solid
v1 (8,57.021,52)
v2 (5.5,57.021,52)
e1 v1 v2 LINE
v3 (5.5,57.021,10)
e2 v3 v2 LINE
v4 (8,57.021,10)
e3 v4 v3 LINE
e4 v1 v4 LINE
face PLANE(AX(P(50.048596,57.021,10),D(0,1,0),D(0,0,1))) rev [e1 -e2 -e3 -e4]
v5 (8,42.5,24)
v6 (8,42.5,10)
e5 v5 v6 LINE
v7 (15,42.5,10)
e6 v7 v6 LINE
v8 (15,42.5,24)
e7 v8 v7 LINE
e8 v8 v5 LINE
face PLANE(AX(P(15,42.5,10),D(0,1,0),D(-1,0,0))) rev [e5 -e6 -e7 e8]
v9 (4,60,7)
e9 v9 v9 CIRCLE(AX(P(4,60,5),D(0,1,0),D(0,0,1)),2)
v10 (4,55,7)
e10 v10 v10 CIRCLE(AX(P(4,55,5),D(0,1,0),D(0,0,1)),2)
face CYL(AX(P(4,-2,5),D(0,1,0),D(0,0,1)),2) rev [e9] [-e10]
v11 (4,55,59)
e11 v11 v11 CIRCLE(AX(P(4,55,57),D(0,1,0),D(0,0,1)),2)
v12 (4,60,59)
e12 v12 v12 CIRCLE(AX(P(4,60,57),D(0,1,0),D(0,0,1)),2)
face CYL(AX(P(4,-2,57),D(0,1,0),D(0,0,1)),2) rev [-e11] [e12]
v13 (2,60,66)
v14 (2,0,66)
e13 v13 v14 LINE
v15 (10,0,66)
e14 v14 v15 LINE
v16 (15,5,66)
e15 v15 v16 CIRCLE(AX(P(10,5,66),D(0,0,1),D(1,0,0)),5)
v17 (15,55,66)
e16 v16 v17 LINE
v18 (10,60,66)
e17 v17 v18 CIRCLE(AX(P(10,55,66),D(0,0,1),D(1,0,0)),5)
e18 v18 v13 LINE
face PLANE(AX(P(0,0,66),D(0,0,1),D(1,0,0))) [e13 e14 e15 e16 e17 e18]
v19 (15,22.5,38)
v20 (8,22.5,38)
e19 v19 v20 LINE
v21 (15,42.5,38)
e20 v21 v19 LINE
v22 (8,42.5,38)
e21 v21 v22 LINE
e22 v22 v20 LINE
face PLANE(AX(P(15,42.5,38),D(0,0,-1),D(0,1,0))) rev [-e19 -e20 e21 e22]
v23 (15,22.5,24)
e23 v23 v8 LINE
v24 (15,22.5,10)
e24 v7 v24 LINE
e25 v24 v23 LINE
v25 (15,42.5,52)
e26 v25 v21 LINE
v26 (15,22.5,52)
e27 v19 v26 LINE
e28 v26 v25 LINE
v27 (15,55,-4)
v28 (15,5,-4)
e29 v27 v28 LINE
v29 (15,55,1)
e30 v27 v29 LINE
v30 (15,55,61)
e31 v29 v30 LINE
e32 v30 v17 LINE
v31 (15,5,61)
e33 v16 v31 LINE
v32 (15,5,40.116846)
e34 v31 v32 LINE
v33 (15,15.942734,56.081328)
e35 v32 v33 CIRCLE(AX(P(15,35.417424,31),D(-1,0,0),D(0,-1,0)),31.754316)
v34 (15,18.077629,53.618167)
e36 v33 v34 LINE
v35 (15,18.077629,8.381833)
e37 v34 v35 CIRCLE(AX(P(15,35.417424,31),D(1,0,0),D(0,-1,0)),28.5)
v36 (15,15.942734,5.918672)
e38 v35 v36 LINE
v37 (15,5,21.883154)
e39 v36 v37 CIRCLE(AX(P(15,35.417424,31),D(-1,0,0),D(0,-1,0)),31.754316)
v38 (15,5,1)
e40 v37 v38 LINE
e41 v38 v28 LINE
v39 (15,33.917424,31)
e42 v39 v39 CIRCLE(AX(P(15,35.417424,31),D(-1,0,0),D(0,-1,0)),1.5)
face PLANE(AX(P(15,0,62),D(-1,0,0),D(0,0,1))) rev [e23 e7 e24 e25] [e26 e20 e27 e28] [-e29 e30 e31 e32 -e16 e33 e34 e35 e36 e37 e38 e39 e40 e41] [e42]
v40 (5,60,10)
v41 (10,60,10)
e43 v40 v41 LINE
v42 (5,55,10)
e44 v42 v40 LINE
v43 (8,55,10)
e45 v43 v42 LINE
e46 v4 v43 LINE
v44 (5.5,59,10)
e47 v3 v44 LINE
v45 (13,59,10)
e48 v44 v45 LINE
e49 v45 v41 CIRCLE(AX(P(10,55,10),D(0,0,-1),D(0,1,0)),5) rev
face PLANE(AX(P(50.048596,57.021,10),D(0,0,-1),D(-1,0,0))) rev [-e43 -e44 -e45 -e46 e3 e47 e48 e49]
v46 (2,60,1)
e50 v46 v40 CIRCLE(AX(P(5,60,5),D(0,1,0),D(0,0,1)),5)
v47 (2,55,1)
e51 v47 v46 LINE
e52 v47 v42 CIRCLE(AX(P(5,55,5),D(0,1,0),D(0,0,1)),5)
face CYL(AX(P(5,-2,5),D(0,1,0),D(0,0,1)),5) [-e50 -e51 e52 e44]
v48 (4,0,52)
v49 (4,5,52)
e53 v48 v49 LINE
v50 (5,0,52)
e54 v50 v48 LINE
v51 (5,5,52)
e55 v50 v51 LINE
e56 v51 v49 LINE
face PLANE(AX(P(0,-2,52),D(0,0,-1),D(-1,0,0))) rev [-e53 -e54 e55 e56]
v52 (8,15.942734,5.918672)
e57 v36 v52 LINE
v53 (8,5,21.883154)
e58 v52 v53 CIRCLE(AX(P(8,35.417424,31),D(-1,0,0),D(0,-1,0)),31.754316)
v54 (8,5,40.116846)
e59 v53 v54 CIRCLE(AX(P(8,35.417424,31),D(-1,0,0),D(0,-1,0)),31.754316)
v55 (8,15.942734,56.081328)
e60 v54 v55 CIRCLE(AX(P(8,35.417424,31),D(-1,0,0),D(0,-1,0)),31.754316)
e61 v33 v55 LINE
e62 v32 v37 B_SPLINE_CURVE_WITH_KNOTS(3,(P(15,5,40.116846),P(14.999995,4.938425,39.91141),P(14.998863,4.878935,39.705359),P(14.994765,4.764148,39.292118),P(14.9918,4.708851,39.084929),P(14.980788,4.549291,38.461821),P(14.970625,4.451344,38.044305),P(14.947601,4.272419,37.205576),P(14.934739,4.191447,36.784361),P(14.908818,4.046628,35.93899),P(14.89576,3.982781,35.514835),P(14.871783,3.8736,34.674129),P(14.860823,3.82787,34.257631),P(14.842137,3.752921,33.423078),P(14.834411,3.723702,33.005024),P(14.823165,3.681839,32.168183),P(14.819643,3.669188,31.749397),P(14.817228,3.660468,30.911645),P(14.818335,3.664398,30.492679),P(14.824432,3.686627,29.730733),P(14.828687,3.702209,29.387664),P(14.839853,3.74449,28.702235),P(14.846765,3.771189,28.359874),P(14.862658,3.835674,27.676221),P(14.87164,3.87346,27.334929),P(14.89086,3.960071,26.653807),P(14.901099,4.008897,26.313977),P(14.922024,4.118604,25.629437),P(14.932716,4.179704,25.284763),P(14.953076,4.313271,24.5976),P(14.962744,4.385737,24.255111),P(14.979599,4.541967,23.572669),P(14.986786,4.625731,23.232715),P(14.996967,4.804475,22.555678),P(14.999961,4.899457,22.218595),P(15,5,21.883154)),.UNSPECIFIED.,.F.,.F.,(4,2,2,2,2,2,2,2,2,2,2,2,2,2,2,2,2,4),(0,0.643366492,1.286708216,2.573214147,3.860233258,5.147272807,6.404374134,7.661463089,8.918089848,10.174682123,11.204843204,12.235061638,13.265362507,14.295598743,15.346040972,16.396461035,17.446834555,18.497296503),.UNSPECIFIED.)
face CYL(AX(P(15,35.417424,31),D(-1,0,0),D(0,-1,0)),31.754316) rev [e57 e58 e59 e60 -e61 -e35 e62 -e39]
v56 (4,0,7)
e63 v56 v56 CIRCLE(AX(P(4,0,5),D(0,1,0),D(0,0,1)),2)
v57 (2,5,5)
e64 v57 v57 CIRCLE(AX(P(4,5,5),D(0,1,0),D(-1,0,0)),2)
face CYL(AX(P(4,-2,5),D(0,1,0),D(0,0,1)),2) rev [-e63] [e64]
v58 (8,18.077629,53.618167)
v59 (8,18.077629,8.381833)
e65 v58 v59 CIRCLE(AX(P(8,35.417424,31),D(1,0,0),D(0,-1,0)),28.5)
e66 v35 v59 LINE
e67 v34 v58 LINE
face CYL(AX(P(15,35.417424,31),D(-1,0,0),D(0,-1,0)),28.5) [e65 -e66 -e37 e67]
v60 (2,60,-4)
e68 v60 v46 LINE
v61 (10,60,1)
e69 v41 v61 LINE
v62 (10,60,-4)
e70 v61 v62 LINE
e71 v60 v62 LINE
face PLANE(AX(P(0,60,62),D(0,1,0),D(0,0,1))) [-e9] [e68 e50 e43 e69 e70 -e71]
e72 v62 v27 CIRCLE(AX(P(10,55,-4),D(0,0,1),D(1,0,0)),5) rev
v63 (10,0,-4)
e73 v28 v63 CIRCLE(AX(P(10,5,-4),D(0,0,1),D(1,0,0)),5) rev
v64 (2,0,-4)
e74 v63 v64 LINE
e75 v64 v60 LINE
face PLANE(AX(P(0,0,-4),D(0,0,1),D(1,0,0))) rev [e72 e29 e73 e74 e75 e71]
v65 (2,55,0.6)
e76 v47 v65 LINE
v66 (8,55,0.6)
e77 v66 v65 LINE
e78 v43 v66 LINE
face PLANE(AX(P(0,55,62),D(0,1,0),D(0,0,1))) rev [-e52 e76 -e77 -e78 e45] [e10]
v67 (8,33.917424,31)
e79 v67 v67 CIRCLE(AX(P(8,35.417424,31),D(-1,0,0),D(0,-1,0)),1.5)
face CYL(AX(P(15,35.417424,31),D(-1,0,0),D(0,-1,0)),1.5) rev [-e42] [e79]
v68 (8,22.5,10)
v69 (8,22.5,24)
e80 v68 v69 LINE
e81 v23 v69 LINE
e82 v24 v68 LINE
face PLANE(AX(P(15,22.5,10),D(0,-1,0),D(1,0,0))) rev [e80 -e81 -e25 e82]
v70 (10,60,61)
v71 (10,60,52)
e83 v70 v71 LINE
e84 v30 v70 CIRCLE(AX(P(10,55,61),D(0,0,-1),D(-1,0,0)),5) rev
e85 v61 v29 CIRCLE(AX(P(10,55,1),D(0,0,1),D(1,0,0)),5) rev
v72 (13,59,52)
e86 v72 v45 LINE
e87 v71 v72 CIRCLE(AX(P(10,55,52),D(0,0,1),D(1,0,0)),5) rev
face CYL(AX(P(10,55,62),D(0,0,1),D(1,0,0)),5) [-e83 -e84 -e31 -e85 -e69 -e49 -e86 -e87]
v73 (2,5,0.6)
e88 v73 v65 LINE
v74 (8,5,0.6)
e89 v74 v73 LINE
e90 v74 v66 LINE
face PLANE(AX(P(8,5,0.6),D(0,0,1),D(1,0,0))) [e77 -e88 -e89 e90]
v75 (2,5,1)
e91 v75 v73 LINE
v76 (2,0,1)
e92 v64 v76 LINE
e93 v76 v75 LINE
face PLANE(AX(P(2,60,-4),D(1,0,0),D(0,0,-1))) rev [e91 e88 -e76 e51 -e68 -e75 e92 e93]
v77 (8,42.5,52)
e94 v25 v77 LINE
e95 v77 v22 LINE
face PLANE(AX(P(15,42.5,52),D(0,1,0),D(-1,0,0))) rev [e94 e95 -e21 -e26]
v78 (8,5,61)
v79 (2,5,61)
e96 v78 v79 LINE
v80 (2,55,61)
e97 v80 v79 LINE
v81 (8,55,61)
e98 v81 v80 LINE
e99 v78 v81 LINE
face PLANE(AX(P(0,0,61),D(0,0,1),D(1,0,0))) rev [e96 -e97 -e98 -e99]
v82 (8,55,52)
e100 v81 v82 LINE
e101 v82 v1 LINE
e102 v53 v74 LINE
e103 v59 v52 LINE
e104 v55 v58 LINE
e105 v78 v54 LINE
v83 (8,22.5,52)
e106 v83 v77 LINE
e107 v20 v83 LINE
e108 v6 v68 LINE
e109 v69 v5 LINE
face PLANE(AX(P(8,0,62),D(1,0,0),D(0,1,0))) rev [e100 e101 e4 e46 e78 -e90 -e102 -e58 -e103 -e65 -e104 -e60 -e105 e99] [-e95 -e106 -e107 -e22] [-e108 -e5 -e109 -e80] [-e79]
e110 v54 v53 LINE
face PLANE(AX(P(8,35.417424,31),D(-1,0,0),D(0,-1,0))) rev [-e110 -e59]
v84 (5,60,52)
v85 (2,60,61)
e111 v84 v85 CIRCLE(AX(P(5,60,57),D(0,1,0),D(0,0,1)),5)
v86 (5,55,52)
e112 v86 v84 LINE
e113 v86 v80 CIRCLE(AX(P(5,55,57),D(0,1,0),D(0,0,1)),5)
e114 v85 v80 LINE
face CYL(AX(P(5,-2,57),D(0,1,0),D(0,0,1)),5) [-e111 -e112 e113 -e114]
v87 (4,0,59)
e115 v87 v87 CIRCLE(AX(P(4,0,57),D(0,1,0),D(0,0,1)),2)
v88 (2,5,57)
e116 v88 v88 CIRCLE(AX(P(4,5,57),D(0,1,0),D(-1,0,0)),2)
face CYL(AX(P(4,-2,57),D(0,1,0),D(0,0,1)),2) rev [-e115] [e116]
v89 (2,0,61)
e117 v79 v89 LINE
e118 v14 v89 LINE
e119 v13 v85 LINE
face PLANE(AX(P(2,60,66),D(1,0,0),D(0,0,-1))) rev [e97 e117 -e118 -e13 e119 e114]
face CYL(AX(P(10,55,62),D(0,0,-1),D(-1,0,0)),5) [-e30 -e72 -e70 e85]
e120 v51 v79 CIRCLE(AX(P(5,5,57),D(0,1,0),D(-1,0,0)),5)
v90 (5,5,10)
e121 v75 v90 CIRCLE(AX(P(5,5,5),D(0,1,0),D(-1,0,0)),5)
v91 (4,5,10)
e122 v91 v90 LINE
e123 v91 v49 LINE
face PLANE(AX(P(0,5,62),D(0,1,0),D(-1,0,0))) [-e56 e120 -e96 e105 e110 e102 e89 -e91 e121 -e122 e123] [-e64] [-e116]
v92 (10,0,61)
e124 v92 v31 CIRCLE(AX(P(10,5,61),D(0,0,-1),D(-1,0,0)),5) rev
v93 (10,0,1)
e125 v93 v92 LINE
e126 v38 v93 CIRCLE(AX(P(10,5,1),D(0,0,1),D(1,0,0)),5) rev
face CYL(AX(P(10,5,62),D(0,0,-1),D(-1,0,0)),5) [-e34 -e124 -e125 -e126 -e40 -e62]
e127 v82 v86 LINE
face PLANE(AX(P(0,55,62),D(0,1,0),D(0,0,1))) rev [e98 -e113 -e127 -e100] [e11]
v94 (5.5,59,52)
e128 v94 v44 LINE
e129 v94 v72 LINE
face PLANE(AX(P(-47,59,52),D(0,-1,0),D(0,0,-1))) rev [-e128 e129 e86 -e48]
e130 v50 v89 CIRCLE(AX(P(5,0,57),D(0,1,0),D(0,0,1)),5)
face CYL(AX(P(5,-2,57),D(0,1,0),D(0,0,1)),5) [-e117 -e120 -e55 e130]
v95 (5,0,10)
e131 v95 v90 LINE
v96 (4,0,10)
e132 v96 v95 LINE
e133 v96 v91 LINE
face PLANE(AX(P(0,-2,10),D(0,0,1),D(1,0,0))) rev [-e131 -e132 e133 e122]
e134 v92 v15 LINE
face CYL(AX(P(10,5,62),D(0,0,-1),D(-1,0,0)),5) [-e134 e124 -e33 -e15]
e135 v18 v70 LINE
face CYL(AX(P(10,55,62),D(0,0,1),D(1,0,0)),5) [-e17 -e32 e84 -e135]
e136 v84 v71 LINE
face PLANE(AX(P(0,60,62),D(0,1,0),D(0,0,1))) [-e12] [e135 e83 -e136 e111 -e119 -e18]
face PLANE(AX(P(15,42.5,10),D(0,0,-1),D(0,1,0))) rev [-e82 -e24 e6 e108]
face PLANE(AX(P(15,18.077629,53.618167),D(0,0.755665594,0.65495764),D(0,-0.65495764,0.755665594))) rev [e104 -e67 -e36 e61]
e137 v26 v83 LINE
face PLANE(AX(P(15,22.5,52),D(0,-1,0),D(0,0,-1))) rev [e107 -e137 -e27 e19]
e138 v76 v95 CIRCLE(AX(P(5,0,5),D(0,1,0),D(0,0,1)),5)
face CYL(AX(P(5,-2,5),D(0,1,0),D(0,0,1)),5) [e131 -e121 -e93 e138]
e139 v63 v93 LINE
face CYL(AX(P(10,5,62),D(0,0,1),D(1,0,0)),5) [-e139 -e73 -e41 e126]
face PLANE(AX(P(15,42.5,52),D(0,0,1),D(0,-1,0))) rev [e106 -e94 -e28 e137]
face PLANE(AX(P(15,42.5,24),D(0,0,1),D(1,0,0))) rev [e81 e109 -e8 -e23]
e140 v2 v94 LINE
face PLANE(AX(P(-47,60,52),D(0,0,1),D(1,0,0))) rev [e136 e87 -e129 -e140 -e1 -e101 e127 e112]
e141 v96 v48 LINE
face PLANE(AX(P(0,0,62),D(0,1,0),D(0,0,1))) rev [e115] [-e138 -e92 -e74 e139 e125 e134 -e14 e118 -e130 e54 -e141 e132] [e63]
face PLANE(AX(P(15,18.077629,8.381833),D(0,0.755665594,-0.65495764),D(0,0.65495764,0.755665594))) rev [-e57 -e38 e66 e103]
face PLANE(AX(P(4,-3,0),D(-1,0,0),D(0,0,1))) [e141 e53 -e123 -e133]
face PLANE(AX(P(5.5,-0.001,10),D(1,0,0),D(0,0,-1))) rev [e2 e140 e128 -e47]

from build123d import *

# Parameters (mm, degrees)
EXTRUDE_1_DEPTH      = 62
FILLET_1_R           = 5
SKETCH_2_W           = 42
SKETCH_2_H           = 1
CUT_EXTRUDE_1_DEPTH  = 62
SKETCH_3_R           = 2
CUT_EXTRUDE_2_DEPTH  = 62
SKETCH_4_W           = 42
SKETCH_4_H           = 2.021
CUT_EXTRUDE_3_DEPTH  = 8
CUT_EXTRUDE_4_DEPTH  = 62
SKETCH_6_W           = 4
SKETCH_6_H           = 42
CUT_EXTRUDE_5_DEPTH  = 62
SKETCH_8_R           = 1.5
SKETCH_8_W           = 14
SKETCH_8_H           = 20
CUT_EXTRUDE_7_DEPTH  = 87.64871609
CUT_EXTRUDE_8_REACH  = 88.891
SKETCH_9_W           = 1.5
SKETCH_9_H           = 42
SKETCH_11_W          = 13.506471924
SKETCH_11_H          = 1
CUT_EXTRUDE_10_DEPTH = 88.572826992
SKETCH_13_W          = 13
SKETCH_13_H          = 60
EXTRUDE_5_DEPTH      = 5
FILLET_2_R           = 5
SKETCH_14_W          = 13
SKETCH_14_H          = 60
EXTRUDE_6_DEPTH      = 5
FILLET_3_R           = 5
SKETCH_15_W          = 0.4
SKETCH_15_H          = 50
CUT_EXTRUDE_11_DEPTH = 6


with BuildPart() as part:
    # 草图1 → 凸台-拉伸1 (new body)
    with BuildSketch(Plane.XY):
        Polygon((0, 5), (0, 0), (15, 0), (15, 60), (0, 60), (0, 55), (8, 55), (8, 5), align=None)
    extrude(amount=EXTRUDE_1_DEPTH)

    # 圆角1
    fillet_1_edges = [part.edges().sort_by_distance(p)[0] for p in [
        (15, 60, 31),
        (15, 0, 31),
    ]]
    fillet(fillet_1_edges, radius=FILLET_1_R)

    # 草图2 → 切除-拉伸1 (cut)
    with BuildSketch(Plane(origin=(15, 0, 0), x_dir=(0, 0, -1), z_dir=(1, 0, 0))):
        with Locations((-31, 59.5)):
            Rectangle(SKETCH_2_W, SKETCH_2_H)
    extrude(amount=-CUT_EXTRUDE_1_DEPTH, mode=Mode.SUBTRACT)

    # 草图3 → 切除-拉伸2 (cut)
    with BuildSketch(Plane(origin=(0, 60, 0), x_dir=(1, 0, 0), z_dir=(0, 1, 0))):
        with Locations(Location((4, -57, 0), (0, 0, 270))):
            Circle(SKETCH_3_R)
        with Locations(Location((4, -5, 0), (0, 0, 270))):
            Circle(SKETCH_3_R)
    extrude(amount=-CUT_EXTRUDE_2_DEPTH, mode=Mode.SUBTRACT)

    # 草图4 → 切除-拉伸3 (cut)
    with BuildSketch(Plane.ZY):
        with Locations((31, 56.0105)):
            Rectangle(SKETCH_4_W, SKETCH_4_H)
    extrude(amount=-CUT_EXTRUDE_3_DEPTH, mode=Mode.SUBTRACT)

    # 草图5 → 切除-拉伸4 (cut)
    with BuildSketch(Plane(origin=(0, 60, 0), x_dir=(1, 0, 0), z_dir=(0, 1, 0))):
        with BuildLine():
            ThreePointArc((0, -5), (1.464466094, -1.464466094), (5, 0))
            Line((5, 0), (0, 0))
            Line((0, 0), (0, -5))
        make_face()
        with BuildLine():
            ThreePointArc((5, -10), (1.464466094, -8.535533906), (0, -5))
            Line((0, -5), (0, -10))
            Line((0, -10), (5, -10))
        make_face()
        with BuildLine():
            ThreePointArc((0, -57), (1.464466094, -53.464466094), (5, -52))
            Line((5, -52), (0, -52))
            Line((0, -52), (0, -57))
        make_face()
        with BuildLine():
            ThreePointArc((5, -62), (1.464466094, -60.535533906), (0, -57))
            Line((0, -57), (0, -62))
            Line((0, -62), (5, -62))
        make_face()
    extrude(amount=-CUT_EXTRUDE_4_DEPTH, mode=Mode.SUBTRACT)

    # 草图6 → 切除-拉伸5 (cut)
    with BuildSketch(Plane(origin=(0, 59, 0), x_dir=(1, 0, 0), z_dir=(0, 1, 0))):
        with Locations((2, -31)):
            Rectangle(SKETCH_6_W, SKETCH_6_H)
    extrude(amount=-CUT_EXTRUDE_5_DEPTH, mode=Mode.SUBTRACT)

    # 草图8 → 切除-拉伸7 (cut, through all)
    with BuildSketch(Plane.ZY.offset(-8)):
        with Locations(Location((31, 35.417424305, 0), (0, 0, 270))):
            Circle(SKETCH_8_R)
        with Locations((17, 32.5)):
            Rectangle(SKETCH_8_W, SKETCH_8_H)
        with Locations((45, 32.5)):
            Rectangle(SKETCH_8_W, SKETCH_8_H)
        with BuildLine():
            Line((8.381832873, 18.077628579), (5.918671616, 15.942734126))
            ThreePointArc((5.918671616, 15.942734126), (31, 3.663108203), (56.081328384, 15.942734126))
            Line((56.081328384, 15.942734126), (53.618167127, 18.077628579))
            ThreePointArc((53.618167127, 18.077628579), (31, 6.917424305), (8.381832873, 18.077628579))
        make_face()
    extrude(amount=-CUT_EXTRUDE_7_DEPTH, mode=Mode.SUBTRACT)

    # 草图9 → 切除-拉伸8 (cut, up to next)
    with BuildSketch(Plane(origin=(0, 59, 0), x_dir=(1, 0, 0), z_dir=(0, 1, 0)), mode=Mode.PRIVATE) as cut_extrude_8_sk1:
        with Locations((4.75, -31)):
            Rectangle(SKETCH_9_W, SKETCH_9_H)
    cut_extrude_8_tool1 = extrude(cut_extrude_8_sk1.sketch, amount=-CUT_EXTRUDE_8_REACH, mode=Mode.PRIVATE) & part.part
    add(cut_extrude_8_tool1.solids().sort_by_distance((4.75, 59, 31))[0], mode=Mode.SUBTRACT)

    # 草图11 → 切除-拉伸10 (cut, through all)
    with BuildSketch(Plane(origin=(0, 60, 0), x_dir=(1, 0, 0), z_dir=(0, 1, 0))):
        with Locations((8.246764038, -61.5)):
            Rectangle(SKETCH_11_W, SKETCH_11_H)
        with Locations((8.246764038, -0.5)):
            Rectangle(SKETCH_11_W, SKETCH_11_H)
    extrude(amount=-CUT_EXTRUDE_10_DEPTH, mode=Mode.SUBTRACT)

    # 草图13 → 凸台-拉伸5 (add)
    with BuildSketch(Plane(origin=(0, 0, 1), x_dir=(-1, 0, 0), z_dir=(0, 0, -1))):
        with Locations((-8.5, 30)):
            Rectangle(SKETCH_13_W, SKETCH_13_H)
    extrude(amount=EXTRUDE_5_DEPTH)

    # 圆角2
    fillet_2_edges = [part.edges().sort_by_distance(p)[0] for p in [
        (15, 0, -1.5),
        (15, 60, -1.5),
    ]]
    fillet(fillet_2_edges, radius=FILLET_2_R)

    # 草图14 → 凸台-拉伸6 (add)
    with BuildSketch(Plane.XY.offset(61)):
        with Locations((8.5, 30)):
            Rectangle(SKETCH_14_W, SKETCH_14_H)
    extrude(amount=EXTRUDE_6_DEPTH)

    # 圆角3
    fillet_3_edges = [part.edges().sort_by_distance(p)[0] for p in [
        (15, 0, 63.5),
        (15, 60, 63.5),
    ]]
    fillet(fillet_3_edges, radius=FILLET_3_R - 0.0001)  # a hair under: the kernel refuses the full size

    # 草图15 → 切除-拉伸11 (cut)
    with BuildSketch(Plane.ZY.offset(-2)):
        with Locations((0.8, 30)):
            Rectangle(SKETCH_15_W, SKETCH_15_H)
    extrude(amount=-CUT_EXTRUDE_11_DEPTH, mode=Mode.SUBTRACT)


solid = part.part
